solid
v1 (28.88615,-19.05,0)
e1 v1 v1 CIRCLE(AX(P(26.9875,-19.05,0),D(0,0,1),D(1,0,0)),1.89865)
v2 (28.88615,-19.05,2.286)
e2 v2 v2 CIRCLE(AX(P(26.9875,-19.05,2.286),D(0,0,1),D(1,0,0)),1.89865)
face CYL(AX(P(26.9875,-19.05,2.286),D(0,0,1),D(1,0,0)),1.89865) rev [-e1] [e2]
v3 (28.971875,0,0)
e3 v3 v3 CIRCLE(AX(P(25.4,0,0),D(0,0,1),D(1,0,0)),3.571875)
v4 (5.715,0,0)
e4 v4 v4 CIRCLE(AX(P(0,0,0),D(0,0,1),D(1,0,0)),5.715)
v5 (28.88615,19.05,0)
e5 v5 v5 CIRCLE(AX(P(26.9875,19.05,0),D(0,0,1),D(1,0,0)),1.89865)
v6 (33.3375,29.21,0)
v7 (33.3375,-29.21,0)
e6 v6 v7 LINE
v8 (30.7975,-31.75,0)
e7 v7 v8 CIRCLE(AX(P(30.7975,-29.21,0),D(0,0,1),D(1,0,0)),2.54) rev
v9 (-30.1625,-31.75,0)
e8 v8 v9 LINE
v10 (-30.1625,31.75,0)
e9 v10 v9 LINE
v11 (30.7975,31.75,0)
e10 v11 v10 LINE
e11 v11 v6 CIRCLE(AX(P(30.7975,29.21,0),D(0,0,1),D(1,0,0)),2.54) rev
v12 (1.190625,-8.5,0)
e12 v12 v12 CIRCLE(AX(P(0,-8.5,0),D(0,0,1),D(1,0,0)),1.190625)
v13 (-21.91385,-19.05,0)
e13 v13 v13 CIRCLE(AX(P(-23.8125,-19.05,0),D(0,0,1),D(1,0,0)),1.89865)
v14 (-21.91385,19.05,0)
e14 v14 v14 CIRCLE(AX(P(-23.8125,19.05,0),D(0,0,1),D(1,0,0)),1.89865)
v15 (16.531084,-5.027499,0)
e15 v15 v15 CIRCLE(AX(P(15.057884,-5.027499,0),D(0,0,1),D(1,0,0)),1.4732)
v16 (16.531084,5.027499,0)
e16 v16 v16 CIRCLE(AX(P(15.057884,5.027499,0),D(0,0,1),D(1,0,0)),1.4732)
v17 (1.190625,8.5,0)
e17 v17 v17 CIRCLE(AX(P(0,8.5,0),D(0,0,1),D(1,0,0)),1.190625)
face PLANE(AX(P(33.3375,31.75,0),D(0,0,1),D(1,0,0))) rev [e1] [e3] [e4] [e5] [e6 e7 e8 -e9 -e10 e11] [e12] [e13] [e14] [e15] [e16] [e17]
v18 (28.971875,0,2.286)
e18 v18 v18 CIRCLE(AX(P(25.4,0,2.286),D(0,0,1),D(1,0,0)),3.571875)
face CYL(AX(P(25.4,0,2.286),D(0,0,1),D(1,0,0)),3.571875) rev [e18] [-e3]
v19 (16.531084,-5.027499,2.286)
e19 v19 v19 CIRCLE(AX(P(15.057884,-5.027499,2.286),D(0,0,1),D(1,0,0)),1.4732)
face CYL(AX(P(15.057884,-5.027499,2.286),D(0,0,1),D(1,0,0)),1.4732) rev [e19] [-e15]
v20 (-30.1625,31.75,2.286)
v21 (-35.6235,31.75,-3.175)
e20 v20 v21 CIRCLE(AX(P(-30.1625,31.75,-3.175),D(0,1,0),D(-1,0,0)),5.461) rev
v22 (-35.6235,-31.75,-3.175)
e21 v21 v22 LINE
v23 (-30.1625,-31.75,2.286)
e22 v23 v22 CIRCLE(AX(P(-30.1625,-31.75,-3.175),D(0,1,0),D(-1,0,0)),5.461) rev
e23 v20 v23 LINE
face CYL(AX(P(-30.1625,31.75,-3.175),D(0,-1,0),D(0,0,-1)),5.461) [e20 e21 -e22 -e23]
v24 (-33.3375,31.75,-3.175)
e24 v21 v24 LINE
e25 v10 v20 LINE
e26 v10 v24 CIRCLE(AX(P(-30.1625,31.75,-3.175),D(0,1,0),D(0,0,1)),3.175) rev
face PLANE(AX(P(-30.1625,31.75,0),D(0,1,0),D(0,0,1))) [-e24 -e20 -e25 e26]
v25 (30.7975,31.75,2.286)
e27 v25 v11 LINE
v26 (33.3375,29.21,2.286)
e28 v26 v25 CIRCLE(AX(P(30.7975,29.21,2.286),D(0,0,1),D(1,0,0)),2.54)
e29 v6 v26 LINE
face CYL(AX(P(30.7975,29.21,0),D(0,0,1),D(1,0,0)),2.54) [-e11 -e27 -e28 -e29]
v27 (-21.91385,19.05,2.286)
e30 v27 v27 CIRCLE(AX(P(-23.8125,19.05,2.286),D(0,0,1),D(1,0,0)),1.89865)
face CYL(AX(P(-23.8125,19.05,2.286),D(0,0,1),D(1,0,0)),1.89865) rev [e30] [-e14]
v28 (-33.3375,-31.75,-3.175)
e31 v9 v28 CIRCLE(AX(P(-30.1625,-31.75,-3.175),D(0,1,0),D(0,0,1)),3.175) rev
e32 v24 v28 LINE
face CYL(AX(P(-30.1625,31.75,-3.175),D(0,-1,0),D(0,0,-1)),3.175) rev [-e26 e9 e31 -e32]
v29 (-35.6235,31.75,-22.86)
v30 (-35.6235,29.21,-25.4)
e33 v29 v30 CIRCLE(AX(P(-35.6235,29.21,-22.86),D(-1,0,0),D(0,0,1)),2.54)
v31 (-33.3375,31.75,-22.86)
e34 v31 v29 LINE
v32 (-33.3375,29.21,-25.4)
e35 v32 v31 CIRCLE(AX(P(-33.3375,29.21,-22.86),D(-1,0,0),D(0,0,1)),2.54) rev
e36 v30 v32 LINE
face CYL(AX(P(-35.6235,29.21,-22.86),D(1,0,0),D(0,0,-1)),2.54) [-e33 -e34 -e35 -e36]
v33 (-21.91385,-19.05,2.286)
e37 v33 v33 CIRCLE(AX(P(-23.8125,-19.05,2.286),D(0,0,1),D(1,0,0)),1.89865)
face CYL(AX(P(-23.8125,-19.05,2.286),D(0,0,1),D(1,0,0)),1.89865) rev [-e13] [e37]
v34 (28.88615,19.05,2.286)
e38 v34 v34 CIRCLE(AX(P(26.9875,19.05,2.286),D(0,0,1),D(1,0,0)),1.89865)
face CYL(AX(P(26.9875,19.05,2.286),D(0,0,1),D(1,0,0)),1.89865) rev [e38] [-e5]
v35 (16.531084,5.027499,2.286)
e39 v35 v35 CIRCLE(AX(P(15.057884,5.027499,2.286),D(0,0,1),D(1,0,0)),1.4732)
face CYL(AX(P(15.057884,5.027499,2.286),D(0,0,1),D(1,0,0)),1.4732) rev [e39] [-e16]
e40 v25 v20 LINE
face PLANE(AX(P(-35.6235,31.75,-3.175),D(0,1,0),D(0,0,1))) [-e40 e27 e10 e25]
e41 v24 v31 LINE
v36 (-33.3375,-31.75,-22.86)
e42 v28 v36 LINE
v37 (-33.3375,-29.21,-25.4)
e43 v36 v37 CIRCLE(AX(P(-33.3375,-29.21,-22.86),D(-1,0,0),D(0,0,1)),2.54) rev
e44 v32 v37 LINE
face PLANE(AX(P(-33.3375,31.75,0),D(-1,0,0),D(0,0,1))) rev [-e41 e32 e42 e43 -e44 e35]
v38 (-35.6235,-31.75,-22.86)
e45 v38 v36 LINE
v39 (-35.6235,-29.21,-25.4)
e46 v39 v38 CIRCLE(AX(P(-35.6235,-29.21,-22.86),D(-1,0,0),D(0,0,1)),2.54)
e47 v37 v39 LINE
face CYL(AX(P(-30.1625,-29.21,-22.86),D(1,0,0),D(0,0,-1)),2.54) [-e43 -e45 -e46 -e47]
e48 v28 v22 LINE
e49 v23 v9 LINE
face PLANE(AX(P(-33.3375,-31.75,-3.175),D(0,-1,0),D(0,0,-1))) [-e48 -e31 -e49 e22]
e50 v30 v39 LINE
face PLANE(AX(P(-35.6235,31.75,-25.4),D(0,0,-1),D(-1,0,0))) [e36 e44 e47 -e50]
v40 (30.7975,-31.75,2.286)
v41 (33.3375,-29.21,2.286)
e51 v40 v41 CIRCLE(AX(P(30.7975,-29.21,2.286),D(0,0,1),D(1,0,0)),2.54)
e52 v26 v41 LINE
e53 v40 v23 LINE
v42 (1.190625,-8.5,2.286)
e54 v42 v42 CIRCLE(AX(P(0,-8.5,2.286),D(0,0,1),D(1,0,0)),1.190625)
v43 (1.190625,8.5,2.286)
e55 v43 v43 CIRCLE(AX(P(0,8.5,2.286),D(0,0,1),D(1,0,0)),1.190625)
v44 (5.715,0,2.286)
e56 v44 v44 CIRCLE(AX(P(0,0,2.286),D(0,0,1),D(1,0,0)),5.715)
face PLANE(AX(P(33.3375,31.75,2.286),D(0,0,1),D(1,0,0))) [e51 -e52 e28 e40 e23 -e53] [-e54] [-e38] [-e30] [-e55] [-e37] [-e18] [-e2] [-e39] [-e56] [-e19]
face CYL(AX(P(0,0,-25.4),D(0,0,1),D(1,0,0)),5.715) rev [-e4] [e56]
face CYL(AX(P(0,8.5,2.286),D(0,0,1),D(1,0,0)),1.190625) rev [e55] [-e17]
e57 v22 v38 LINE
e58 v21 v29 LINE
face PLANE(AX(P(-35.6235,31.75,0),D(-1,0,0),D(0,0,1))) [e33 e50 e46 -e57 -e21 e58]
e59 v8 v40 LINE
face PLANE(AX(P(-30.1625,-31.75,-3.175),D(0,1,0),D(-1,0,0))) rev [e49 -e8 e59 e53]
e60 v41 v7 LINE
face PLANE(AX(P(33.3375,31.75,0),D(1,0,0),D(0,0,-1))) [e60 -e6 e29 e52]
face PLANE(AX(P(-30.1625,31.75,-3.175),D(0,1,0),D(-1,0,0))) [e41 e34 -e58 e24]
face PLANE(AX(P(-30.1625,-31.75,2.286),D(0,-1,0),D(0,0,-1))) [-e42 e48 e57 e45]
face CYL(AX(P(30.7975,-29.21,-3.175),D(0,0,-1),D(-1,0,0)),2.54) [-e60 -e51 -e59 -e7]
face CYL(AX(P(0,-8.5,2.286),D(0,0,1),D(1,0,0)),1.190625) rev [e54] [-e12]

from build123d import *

# Parameters (mm, degrees)
BASE_FLANGE1_DEPTH              = 31.75
FILLET1_R                       = 2.54
F_25_0_1495_DIAMETER_HOLE1_D    = 3.7973
SKETCH10_R                      = 5.715
CUT_EXTRUDE1_DEPTH              = 56.168930099
F_9_32_0_28125_DIAMETER_HOLE1_D = 7.14375
F_3_32_0_09375_DIAMETER_HOLE1_D = 2.38125
F_32_0_116_DIAMETER_HOLE1_D     = 2.9464


# Sheet-metal steps are written as plain solids
with BuildPart() as part:
    # Sketch3 → Base-Flange1 (new, symmetric)
    with BuildSketch(Plane(origin=(0, 0, 0), x_dir=(-1, 0, 0), z_dir=(0, 1, 0))):
        with BuildLine():
            Line((-33.3375, 0), (30.1625, 0))
            ThreePointArc((30.1625, 0), (32.40756403, -0.92993597), (33.3375, -3.175))
            Line((33.3375, -3.175), (33.3375, -25.4))
            Line((33.3375, -25.4), (35.6235, -25.4))
            Line((35.6235, -25.4), (35.6235, -3.175))
            ThreePointArc((35.6235, -3.175), (34.024010132, 0.686510132), (30.1625, 2.286))
            Line((30.1625, 2.286), (-33.3375, 2.286))
            Line((-33.3375, 2.286), (-33.3375, 0))
        make_face()
    extrude(amount=BASE_FLANGE1_DEPTH, both=True)

    # Fillet1
    fillet1_edges = [part.edges().sort_by_distance(p)[0] for p in [
        (33.3375, 31.75, 1.143),
        (33.3375, -31.75, 1.143),
        (-34.4805, 31.75, -25.4),
        (-34.4805, -31.75, -25.4),
    ]]
    fillet(fillet1_edges, radius=FILLET1_R)

    # #25 (0.1495) Diameter Hole1 (through all)
    with Locations(Plane.XY.offset(2.286)):
        with Locations((-23.8125, 19.05), (26.9875, 19.05), (26.9875, -19.05), (-23.8125, -19.05)):
            Hole(F_25_0_1495_DIAMETER_HOLE1_D / 2)

    # Sketch10 → Cut-Extrude1 (cut, through all)
    with BuildSketch(Plane.XY.offset(2.286)):
        Circle(SKETCH10_R)
    extrude(amount=-CUT_EXTRUDE1_DEPTH, mode=Mode.SUBTRACT)

    # 9/32 (0.28125) Diameter Hole1 (through all)
    with Locations(Plane.XY.offset(2.286)):
        with Locations((25.4, 0)):
            Hole(F_9_32_0_28125_DIAMETER_HOLE1_D / 2)

    # 3/32 (0.09375) Diameter Hole1 (through all)
    with Locations(Plane.XY.offset(2.286)):
        with Locations((0, 8.5), (0, -8.5)):
            Hole(F_3_32_0_09375_DIAMETER_HOLE1_D / 2)

    # #32 (0.116) Diameter Hole1 (through all)
    with Locations(Plane.XY.offset(2.286)):
        with Locations((15.057884182, 5.027499276), (15.057884182, -5.027499276)):
            Hole(F_32_0_116_DIAMETER_HOLE1_D / 2)


solid = part.part
